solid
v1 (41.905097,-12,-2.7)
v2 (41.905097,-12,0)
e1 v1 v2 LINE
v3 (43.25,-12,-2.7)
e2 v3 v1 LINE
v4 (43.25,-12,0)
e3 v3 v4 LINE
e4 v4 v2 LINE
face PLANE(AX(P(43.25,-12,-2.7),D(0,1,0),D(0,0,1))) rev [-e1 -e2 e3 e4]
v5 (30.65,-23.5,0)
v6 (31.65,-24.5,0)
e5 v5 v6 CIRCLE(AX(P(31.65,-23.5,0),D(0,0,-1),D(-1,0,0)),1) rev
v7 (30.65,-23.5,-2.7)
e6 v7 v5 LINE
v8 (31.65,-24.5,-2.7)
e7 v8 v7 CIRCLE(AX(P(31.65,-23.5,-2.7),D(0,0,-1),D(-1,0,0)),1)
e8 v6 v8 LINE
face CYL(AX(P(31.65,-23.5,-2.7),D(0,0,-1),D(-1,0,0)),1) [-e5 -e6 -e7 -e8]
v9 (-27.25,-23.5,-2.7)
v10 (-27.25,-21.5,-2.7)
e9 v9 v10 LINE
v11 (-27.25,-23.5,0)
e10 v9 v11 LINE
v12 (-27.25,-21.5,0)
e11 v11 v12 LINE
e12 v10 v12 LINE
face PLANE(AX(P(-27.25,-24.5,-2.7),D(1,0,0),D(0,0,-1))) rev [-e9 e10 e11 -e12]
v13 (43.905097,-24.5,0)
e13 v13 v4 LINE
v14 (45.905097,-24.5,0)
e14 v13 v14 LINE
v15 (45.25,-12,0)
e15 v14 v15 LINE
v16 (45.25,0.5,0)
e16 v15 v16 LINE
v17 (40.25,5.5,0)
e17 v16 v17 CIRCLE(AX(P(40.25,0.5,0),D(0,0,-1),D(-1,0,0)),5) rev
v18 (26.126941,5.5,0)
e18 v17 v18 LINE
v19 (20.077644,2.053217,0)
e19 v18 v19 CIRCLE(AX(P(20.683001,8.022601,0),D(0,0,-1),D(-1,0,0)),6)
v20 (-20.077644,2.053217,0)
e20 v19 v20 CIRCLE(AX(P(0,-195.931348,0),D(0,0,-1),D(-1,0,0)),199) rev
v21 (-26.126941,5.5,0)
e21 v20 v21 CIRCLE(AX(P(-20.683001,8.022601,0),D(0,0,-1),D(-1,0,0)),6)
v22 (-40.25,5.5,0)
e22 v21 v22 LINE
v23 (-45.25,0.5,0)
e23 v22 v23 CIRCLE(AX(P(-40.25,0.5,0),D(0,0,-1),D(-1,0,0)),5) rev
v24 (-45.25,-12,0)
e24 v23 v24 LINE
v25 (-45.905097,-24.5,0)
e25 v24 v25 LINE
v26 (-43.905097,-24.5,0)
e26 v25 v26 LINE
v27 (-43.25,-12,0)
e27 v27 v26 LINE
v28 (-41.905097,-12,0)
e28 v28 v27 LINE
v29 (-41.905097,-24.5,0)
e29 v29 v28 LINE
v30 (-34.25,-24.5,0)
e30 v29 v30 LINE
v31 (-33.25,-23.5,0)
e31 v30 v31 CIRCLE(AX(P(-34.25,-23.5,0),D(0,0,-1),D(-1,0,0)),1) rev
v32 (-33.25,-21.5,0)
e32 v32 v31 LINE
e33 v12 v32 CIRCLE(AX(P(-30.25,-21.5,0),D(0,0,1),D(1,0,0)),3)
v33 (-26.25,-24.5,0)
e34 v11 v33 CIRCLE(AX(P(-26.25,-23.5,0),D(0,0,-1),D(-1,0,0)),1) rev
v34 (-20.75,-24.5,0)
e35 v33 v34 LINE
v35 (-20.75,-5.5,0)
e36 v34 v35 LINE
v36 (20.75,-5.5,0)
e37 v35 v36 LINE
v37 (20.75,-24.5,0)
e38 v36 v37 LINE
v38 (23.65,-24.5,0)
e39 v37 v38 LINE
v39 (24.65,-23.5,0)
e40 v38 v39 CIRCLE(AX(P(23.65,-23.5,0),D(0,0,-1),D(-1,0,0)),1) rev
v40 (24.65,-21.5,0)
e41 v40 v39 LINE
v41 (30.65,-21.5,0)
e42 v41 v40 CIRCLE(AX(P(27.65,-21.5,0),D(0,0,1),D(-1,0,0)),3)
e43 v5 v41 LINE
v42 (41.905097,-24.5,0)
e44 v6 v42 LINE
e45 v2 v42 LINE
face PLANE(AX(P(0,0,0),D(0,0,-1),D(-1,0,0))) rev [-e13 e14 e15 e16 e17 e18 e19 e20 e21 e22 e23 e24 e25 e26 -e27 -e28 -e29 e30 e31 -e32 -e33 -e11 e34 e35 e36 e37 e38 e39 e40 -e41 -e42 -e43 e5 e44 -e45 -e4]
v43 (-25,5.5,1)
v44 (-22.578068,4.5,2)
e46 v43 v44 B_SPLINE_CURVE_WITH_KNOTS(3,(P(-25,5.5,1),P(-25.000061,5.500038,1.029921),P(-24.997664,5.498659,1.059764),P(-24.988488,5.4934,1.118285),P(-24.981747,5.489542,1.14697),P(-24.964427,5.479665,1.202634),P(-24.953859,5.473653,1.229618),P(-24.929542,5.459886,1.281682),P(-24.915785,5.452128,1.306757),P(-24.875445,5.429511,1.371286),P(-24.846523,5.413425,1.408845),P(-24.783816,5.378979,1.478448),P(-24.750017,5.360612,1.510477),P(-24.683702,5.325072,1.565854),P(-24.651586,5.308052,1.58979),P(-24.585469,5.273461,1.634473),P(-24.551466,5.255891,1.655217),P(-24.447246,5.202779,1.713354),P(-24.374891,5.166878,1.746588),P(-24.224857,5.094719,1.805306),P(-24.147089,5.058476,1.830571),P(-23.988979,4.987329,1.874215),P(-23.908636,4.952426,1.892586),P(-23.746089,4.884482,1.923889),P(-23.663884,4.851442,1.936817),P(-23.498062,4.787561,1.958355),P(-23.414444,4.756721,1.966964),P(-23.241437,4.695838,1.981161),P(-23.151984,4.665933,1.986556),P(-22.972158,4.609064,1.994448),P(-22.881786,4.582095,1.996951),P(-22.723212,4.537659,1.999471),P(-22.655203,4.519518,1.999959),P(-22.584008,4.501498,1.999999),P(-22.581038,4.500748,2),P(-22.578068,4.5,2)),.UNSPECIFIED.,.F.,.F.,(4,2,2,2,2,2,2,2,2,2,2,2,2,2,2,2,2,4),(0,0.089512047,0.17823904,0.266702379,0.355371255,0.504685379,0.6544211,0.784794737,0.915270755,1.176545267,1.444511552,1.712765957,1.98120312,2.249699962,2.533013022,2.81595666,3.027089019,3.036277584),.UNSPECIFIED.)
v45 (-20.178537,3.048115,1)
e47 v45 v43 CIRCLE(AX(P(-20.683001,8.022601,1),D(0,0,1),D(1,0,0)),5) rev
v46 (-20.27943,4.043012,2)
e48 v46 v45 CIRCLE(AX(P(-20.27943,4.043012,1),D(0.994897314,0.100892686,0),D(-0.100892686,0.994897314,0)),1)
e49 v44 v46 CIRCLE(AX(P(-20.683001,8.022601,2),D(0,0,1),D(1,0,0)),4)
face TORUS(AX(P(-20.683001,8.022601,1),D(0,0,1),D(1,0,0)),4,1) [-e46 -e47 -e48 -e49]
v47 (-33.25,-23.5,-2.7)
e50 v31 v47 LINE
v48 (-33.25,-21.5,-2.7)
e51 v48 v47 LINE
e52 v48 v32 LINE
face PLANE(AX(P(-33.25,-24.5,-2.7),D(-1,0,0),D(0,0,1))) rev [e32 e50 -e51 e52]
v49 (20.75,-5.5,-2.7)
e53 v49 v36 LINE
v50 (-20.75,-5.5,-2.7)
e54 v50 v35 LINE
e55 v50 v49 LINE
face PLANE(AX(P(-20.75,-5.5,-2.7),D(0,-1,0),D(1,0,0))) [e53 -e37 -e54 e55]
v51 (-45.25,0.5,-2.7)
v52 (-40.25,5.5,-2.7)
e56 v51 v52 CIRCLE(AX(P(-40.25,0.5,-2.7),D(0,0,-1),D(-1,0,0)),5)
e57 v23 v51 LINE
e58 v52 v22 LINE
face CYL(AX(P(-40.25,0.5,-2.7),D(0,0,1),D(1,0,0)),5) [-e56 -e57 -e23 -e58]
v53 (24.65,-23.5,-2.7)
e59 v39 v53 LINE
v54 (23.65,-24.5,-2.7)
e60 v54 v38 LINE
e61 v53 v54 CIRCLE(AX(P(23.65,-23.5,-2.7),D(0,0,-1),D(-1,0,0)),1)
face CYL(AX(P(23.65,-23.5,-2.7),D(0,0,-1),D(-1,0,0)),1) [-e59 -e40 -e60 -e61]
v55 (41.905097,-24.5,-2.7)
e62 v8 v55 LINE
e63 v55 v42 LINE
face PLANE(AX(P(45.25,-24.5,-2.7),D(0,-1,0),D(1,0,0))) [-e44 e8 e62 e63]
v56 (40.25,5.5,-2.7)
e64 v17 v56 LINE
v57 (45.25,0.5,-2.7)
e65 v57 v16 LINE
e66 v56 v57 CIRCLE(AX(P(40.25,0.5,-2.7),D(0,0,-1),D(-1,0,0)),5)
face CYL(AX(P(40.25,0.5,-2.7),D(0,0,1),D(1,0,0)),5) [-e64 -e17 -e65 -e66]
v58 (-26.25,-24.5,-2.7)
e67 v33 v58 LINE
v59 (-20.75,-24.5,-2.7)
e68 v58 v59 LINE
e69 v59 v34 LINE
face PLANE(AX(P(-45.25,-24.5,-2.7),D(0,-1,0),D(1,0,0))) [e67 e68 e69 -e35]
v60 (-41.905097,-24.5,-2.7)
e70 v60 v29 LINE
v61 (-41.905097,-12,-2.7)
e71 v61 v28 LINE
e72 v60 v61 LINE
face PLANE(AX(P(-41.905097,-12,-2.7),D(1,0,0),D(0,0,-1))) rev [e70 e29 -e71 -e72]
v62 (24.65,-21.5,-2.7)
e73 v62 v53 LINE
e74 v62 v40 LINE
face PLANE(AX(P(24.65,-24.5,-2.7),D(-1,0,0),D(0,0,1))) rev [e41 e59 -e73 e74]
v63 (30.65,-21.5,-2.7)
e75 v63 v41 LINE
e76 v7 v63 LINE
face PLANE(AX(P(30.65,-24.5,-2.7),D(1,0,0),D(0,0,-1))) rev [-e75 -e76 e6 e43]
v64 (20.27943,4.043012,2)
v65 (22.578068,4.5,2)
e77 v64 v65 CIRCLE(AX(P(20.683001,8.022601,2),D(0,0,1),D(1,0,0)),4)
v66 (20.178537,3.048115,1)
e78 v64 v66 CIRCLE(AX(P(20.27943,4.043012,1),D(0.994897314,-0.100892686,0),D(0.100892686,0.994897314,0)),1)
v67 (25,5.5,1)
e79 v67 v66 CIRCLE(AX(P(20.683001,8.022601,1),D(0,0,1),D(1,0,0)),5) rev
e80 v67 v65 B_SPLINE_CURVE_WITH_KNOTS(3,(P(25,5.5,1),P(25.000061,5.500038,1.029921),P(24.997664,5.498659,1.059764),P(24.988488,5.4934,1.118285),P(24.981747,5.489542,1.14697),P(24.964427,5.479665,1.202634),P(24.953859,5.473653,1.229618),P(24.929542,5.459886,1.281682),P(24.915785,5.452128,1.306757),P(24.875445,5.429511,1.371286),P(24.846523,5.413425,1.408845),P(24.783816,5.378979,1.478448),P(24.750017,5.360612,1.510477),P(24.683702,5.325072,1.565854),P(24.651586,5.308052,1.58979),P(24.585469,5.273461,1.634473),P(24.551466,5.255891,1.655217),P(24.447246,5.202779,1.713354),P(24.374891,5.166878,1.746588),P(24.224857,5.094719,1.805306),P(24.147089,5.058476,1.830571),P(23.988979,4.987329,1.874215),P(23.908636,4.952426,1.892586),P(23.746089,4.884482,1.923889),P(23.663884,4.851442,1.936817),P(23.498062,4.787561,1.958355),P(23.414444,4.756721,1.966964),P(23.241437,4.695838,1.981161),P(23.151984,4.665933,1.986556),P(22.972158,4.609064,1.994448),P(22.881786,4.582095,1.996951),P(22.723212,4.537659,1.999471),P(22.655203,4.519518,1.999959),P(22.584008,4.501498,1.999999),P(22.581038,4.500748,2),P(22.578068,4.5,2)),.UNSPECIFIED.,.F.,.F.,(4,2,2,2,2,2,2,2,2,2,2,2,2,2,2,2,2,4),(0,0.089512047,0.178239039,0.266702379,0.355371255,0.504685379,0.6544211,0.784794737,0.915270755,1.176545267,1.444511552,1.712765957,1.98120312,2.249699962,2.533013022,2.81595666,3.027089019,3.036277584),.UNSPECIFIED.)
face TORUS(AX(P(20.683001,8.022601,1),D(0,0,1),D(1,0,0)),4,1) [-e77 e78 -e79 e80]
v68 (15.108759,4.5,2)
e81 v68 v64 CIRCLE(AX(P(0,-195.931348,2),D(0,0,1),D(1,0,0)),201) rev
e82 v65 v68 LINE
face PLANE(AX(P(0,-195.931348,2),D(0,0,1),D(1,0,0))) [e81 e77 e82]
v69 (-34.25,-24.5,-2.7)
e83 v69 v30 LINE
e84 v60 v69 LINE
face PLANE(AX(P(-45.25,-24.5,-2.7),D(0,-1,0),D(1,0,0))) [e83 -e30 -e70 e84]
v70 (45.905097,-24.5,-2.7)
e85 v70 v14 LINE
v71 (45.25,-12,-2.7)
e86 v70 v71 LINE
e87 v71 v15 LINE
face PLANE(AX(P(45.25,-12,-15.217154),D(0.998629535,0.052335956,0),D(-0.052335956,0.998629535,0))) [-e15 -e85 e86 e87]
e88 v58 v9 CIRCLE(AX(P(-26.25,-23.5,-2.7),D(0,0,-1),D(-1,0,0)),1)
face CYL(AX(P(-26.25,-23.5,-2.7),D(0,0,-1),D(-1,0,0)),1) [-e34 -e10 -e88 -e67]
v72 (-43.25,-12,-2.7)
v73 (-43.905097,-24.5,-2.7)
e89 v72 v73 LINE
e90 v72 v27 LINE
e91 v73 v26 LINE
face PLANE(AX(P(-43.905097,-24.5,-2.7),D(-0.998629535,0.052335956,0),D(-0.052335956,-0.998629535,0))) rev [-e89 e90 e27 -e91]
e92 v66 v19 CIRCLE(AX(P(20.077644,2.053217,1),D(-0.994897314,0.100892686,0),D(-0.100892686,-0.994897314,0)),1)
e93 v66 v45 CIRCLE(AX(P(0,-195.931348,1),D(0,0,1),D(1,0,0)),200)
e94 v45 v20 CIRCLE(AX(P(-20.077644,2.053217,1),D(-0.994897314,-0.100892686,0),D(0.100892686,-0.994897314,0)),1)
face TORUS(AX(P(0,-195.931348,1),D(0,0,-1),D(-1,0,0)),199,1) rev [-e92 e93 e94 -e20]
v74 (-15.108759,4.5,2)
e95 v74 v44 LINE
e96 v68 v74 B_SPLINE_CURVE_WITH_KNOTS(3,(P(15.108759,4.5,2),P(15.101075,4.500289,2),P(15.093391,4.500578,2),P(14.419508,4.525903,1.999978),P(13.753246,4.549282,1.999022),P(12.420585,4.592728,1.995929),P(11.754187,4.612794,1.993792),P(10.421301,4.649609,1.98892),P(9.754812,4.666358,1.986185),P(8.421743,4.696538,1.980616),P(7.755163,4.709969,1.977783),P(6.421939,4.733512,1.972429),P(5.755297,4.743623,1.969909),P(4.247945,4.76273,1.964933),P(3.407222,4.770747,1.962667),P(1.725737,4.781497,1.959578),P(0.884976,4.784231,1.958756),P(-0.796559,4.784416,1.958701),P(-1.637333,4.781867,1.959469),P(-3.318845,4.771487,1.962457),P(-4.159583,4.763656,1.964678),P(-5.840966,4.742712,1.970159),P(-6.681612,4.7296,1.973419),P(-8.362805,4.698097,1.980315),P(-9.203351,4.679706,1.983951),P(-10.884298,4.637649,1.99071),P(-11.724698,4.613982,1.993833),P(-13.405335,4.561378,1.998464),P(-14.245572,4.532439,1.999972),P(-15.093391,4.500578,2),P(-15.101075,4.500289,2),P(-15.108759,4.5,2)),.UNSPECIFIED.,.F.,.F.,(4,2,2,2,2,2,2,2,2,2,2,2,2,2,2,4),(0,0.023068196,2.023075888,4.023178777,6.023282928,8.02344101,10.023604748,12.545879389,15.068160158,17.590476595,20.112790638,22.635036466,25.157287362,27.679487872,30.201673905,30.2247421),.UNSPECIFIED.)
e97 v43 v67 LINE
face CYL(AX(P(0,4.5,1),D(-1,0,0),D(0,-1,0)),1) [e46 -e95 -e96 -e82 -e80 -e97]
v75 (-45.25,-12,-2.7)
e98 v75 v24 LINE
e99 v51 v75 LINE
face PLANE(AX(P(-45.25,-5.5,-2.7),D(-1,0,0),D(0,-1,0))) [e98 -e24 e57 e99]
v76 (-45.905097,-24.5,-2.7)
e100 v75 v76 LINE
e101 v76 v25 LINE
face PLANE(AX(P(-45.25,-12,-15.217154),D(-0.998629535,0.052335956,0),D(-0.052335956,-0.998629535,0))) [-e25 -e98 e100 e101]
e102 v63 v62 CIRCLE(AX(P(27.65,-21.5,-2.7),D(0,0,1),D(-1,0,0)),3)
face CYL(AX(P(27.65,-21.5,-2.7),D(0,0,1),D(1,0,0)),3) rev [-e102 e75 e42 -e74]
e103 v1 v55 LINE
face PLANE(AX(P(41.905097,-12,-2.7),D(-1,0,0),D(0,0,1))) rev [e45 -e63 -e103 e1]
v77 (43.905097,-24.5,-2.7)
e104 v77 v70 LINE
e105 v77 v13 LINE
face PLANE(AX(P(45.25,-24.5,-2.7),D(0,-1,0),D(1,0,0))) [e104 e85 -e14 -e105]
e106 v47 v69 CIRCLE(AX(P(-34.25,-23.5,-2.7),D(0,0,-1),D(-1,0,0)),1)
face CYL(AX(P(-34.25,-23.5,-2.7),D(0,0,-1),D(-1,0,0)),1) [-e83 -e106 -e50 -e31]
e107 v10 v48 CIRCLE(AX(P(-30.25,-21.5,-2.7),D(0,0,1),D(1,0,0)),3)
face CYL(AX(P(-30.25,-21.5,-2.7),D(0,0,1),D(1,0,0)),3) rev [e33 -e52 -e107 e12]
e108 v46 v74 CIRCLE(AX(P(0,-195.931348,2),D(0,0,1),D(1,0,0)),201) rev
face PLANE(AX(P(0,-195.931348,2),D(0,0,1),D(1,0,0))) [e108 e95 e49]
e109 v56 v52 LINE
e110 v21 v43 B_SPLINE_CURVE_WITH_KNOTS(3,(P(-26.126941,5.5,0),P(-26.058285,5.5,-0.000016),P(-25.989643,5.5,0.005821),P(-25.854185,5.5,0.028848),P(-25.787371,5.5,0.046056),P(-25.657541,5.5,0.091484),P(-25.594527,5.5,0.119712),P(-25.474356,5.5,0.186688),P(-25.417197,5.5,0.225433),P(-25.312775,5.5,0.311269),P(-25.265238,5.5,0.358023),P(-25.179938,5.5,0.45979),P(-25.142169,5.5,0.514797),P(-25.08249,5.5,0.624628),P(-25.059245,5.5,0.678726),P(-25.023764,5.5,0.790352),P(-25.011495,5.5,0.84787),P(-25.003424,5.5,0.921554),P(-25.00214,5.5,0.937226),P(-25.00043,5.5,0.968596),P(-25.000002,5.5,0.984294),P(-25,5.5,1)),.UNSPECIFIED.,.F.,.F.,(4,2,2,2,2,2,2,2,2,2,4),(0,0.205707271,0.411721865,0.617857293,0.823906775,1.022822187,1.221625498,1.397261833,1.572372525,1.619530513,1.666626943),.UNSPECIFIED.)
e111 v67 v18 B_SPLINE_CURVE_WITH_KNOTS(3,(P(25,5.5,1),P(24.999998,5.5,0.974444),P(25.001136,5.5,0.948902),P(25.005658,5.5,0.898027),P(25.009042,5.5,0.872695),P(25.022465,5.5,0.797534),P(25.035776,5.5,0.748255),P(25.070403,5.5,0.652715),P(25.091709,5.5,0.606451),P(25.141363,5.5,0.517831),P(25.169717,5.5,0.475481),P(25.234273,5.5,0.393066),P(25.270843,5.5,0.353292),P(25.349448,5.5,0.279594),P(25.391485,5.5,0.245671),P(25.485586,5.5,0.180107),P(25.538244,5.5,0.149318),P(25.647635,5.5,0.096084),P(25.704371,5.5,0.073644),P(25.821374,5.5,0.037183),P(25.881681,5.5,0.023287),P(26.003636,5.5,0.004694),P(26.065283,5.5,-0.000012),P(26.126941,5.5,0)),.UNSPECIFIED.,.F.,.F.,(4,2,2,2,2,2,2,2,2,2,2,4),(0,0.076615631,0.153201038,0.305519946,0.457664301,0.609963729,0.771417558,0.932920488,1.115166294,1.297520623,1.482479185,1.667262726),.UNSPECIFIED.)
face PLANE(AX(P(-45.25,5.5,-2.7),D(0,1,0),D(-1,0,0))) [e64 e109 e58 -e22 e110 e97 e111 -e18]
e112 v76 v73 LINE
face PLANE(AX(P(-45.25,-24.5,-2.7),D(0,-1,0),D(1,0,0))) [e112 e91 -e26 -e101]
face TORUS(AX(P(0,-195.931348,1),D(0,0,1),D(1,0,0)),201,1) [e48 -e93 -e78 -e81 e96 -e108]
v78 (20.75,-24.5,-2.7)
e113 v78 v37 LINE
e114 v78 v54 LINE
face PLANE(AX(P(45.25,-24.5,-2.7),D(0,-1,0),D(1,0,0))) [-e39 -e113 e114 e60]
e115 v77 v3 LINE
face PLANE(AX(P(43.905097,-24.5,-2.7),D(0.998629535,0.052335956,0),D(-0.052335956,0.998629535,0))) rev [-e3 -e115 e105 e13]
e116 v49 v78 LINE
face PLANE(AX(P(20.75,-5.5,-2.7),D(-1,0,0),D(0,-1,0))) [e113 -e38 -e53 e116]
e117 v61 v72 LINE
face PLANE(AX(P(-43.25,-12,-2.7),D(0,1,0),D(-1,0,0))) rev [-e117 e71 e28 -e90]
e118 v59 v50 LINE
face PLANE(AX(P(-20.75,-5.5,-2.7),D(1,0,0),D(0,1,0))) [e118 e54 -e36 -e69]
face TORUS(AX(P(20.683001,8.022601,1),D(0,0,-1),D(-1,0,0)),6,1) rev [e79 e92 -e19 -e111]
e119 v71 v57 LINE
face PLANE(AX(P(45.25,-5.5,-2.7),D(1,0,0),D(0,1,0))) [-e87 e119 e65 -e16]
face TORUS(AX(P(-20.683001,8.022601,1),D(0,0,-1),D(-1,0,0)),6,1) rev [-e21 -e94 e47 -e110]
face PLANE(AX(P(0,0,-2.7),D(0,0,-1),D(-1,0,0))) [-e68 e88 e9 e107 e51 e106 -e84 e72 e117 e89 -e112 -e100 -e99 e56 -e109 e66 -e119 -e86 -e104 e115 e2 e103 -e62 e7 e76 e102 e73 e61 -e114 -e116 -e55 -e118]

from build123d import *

# Parameters (mm, degrees)
BOSS_EXTRUDE1_DEPTH  = 2.7
FILLET1_R            = 5
BOSS_EXTRUDE2_DEPTH  = 2
FILLET2_R            = 5
FILLET3_R            = 1
FASTENER_HOLES_DEPTH = 52.527686738
FILLET4_R            = 1
WEDGE_DEPTH          = 2.7
CUT_EXTRUDE2_DEPTH   = 53.103914951


with BuildPart() as part:
    # Sketch1 → Boss-Extrude1 (new body)
    with BuildSketch(Plane.XY):
        Polygon((-20.75, -5.5), (20.75, -5.5), (20.75, -24.5), (45.25, -24.5), (45.25, -5.5), (45.25, 5.5), (-45.25, 5.5), (-45.25, -5.5), (-45.25, -24.5), (-20.75, -24.5), align=None)
    extrude(amount=-BOSS_EXTRUDE1_DEPTH)

    # Fillet1
    fillet1_edges = [part.edges().sort_by_distance(p)[0] for p in [
        (-45.25, 5.5, -1.35),
        (45.25, 5.5, -1.35),
    ]]
    fillet(fillet1_edges, radius=FILLET1_R)

    # Sketch2 → Boss-Extrude2 (add)
    with BuildSketch(Plane.XY):
        with BuildLine():
            Line((-25, 5.5), (25, 5.5))
            Line((25, 5.5), (25, 2.5))
            ThreePointArc((25, 2.5), (0, 4.06865167), (-25, 2.5))
            Line((-25, 2.5), (-25, 5.5))
        make_face()
    extrude(amount=BOSS_EXTRUDE2_DEPTH)

    # Fillet2
    # the kernel refuses this fillet: 5 mm, written as the material it takes off along each edge
    with BuildSketch(Plane(origin=(-25, 2.5, 0), x_dir=(0, 1, 0), z_dir=(0, 0, 1))) as fillet2_piece_1:
        with BuildLine():
            CenterArc((5.522601094, -4.316999388), FILLET2_R, 120.299508601, 65.491069006)
            ThreePointArc((0.548114523, -4.821462818), (0.288680447, -2.409069013), (0, 0))
            Line((0, 0), (3, 0))
        make_face()
    extrude(amount=14.131295591, mode=Mode.SUBTRACT)
    with BuildSketch(Plane(origin=(25, 2.5, 0), x_dir=(-0.9936001438850942, 0.11295465493515582, 0), z_dir=(0, 0, 1))) as fillet2_piece_2:
        with BuildLine():
            CenterArc((4.913174714, -4.999632066), FILLET2_R, 90.695089087, 65.491069006)
            Line((0.338863965, -2.980800432), (0, 0))
            ThreePointArc((0, 0), (2.426259118, -0.014717375), (4.852518236, 0))
        make_face()
    extrude(amount=14.131295591, mode=Mode.SUBTRACT)

    # Fillet3
    # the kernel refuses this fillet: 1 mm, written as the material it adds along each edge
    with BuildSketch(Plane(origin=(20.683000612, 8.022601094, 0), x_dir=(-0.10089268591027718, -0.9948973142640452, 0), z_dir=(-0.9948973142640452, 0.10089268591027718, 0))) as fillet3_piece_1_section:
        with BuildLine():
            CenterArc((5 + FILLET3_R, FILLET3_R), FILLET3_R, 180, 90)
            Line((5, FILLET3_R), (5, 0))
            Line((5, 0), (5 + FILLET3_R, 0))
        make_face()
    fillet3_piece_1 = revolve(axis=Axis((20.683000612, 8.022601094, 0), (0, 0, 1)), revolution_arc=94.145051676, mode=Mode.PRIVATE)
    fillet3_piece_1 = split(fillet3_piece_1, bisect_by=Plane(origin=(23.299245225, 5.5, 0.284698162), z_dir=(0, -1, 0)), keep=Keep.TOP, mode=Mode.PRIVATE)
    add(fillet3_piece_1)
    with BuildSketch(Plane(origin=(0, -195.93134833, 0), x_dir=(0.1008926859104223, 0.9948973142640303, 0), z_dir=(0.9948973142640303, -0.1008926859104223, 0))) as fillet3_piece_2:
        with BuildLine():
            CenterArc((200 - FILLET3_R, FILLET3_R), FILLET3_R, 270, 90)
            Line((200, FILLET3_R), (200, 0))
            Line((200, 0), (200 - FILLET3_R, 0))
        make_face()
    revolve(axis=Axis((0, -195.93134833, 0), (0, 0, 1)), revolution_arc=11.581155214)
    with BuildSketch(Plane(origin=(-20.683000612, 8.022601094, 0), x_dir=(-0.999587613586136, -0.028715897429362498, 0), z_dir=(-0.028715897429362498, 0.999587613586136, 0))) as fillet3_piece_3_section:
        with BuildLine():
            CenterArc((5 + FILLET3_R, FILLET3_R), FILLET3_R, 180, 90)
            Line((5, FILLET3_R), (5, 0))
            Line((5, 0), (5 + FILLET3_R, 0))
        make_face()
    fillet3_piece_3 = revolve(axis=Axis((-20.683000612, 8.022601094, 0), (0, 0, 1)), revolution_arc=94.145051676, mode=Mode.PRIVATE)
    fillet3_piece_3 = split(fillet3_piece_3, bisect_by=Plane(origin=(-23.299245227, 5.5, 0.284698166), z_dir=(0, -1, 0)), keep=Keep.TOP, mode=Mode.PRIVATE)
    add(fillet3_piece_3)
    # the kernel refuses this fillet: 1 mm, written as the material it takes off along each edge
    with BuildSketch(Plane(origin=(20.683000612, 8.022601094, 2), x_dir=(0.9995876135861396, -0.028715897429238708, 0), z_dir=(0.028715897429238708, 0.9995876135861396, 0))) as fillet3_2_piece_1:
        with BuildLine():
            CenterArc((5 - FILLET3_R, FILLET3_R), FILLET3_R, 270, 90)
            Line((5, FILLET3_R), (5, 0))
            Line((5, 0), (5 - FILLET3_R, 0))
        make_face()
    revolve(axis=Axis((20.683000612, 8.022601094, 2), (0, 0, -1)), revolution_arc=94.145051676, mode=Mode.SUBTRACT)
    with BuildSketch(Plane(origin=(0, -195.93134833, 2), x_dir=(0.10089268591041367, 0.9948973142640313, 0), z_dir=(0.9948973142640313, -0.10089268591041367, 0))) as fillet3_2_piece_2:
        with BuildLine():
            CenterArc((200 + FILLET3_R, -FILLET3_R), FILLET3_R, 90, 90)
            Line((200, -FILLET3_R), (200, 0))
            Line((200, 0), (200 + FILLET3_R, 0))
        make_face()
    revolve(axis=Axis((0, -195.93134833, 2), (0, 0, 1)), revolution_arc=11.581155214, mode=Mode.SUBTRACT)
    with BuildSketch(Plane(origin=(-20.683000612, 8.022601094, 2), x_dir=(0.10089268591039939, -0.9948973142640327, 0), z_dir=(0.9948973142640327, 0.10089268591039939, 0))) as fillet3_2_piece_3:
        with BuildLine():
            CenterArc((5 - FILLET3_R, FILLET3_R), FILLET3_R, 270, 90)
            Line((5 - FILLET3_R, 0), (5, 0))
            Line((5, 0), (5, FILLET3_R))
        make_face()
    revolve(axis=Axis((-20.683000612, 8.022601094, 2), (0, 0, -1)), revolution_arc=94.145051676, mode=Mode.SUBTRACT)
    with BuildSketch(Plane(origin=(-27.5, 5.5, 2), x_dir=(0, 0, -1), z_dir=(1, 0, 0))) as fillet3_2_piece_4:
        with BuildLine():
            CenterArc((FILLET3_R, -FILLET3_R), FILLET3_R, 90, 90)
            Line((0, -FILLET3_R), (0, 0))
            Line((0, 0), (FILLET3_R, 0))
        make_face()
    extrude(amount=55, mode=Mode.SUBTRACT)

    # Sketch3 → Fastener holes (cut, through all)
    with BuildSketch(Plane.XY):
        with BuildLine():
            Line((-33.25, -24.5), (-33.25, -21.5))
            ThreePointArc((-33.25, -21.5), (-30.25, -18.5), (-27.25, -21.5))
            Line((-27.25, -21.5), (-27.25, -24.5))
            ThreePointArc((-27.25, -24.5), (-30.25, -27.5), (-33.25, -24.5))
        make_face()
        with BuildLine():
            Line((30.65, -24.5), (30.65, -21.5))
            ThreePointArc((30.65, -21.5), (27.65, -18.5), (24.65, -21.5))
            Line((24.65, -21.5), (24.65, -24.5))
            ThreePointArc((24.65, -24.5), (27.65, -27.5), (30.65, -24.5))
        make_face()
    extrude(amount=-FASTENER_HOLES_DEPTH, mode=Mode.SUBTRACT)

    # Fillet4
    fillet4_edges = [part.edges().sort_by_distance(p)[0] for p in [
        (-27.25, -24.5, -1.35),
        (-33.25, -24.5, -1.35),
        (30.65, -24.5, -1.35),
        (24.65, -24.5, -1.35),
    ]]
    fillet(fillet4_edges, radius=FILLET4_R)

    # Sketch4 → Wedge (add)
    with BuildSketch(Plane.XY):
        Polygon((45.25, -12), (45.905097241, -24.5), (45.25, -24.5), align=None)
        Polygon((-45.25, -12), (-45.25, -24.5), (-45.905097241, -24.5), align=None)
    extrude(amount=-WEDGE_DEPTH)

    # Sketch5 → Cut-Extrude2 (cut, through all)
    with BuildSketch(Plane.XY):
        Polygon((43.905097241, -24.5), (43.25, -12), (41.905097241, -12), (41.905097241, -24.5), align=None)
        Polygon((-41.905097241, -24.5), (-43.905097241, -24.5), (-43.25, -12), (-41.905097241, -12), align=None)
    extrude(amount=-CUT_EXTRUDE2_DEPTH, mode=Mode.SUBTRACT)


solid = part.part
